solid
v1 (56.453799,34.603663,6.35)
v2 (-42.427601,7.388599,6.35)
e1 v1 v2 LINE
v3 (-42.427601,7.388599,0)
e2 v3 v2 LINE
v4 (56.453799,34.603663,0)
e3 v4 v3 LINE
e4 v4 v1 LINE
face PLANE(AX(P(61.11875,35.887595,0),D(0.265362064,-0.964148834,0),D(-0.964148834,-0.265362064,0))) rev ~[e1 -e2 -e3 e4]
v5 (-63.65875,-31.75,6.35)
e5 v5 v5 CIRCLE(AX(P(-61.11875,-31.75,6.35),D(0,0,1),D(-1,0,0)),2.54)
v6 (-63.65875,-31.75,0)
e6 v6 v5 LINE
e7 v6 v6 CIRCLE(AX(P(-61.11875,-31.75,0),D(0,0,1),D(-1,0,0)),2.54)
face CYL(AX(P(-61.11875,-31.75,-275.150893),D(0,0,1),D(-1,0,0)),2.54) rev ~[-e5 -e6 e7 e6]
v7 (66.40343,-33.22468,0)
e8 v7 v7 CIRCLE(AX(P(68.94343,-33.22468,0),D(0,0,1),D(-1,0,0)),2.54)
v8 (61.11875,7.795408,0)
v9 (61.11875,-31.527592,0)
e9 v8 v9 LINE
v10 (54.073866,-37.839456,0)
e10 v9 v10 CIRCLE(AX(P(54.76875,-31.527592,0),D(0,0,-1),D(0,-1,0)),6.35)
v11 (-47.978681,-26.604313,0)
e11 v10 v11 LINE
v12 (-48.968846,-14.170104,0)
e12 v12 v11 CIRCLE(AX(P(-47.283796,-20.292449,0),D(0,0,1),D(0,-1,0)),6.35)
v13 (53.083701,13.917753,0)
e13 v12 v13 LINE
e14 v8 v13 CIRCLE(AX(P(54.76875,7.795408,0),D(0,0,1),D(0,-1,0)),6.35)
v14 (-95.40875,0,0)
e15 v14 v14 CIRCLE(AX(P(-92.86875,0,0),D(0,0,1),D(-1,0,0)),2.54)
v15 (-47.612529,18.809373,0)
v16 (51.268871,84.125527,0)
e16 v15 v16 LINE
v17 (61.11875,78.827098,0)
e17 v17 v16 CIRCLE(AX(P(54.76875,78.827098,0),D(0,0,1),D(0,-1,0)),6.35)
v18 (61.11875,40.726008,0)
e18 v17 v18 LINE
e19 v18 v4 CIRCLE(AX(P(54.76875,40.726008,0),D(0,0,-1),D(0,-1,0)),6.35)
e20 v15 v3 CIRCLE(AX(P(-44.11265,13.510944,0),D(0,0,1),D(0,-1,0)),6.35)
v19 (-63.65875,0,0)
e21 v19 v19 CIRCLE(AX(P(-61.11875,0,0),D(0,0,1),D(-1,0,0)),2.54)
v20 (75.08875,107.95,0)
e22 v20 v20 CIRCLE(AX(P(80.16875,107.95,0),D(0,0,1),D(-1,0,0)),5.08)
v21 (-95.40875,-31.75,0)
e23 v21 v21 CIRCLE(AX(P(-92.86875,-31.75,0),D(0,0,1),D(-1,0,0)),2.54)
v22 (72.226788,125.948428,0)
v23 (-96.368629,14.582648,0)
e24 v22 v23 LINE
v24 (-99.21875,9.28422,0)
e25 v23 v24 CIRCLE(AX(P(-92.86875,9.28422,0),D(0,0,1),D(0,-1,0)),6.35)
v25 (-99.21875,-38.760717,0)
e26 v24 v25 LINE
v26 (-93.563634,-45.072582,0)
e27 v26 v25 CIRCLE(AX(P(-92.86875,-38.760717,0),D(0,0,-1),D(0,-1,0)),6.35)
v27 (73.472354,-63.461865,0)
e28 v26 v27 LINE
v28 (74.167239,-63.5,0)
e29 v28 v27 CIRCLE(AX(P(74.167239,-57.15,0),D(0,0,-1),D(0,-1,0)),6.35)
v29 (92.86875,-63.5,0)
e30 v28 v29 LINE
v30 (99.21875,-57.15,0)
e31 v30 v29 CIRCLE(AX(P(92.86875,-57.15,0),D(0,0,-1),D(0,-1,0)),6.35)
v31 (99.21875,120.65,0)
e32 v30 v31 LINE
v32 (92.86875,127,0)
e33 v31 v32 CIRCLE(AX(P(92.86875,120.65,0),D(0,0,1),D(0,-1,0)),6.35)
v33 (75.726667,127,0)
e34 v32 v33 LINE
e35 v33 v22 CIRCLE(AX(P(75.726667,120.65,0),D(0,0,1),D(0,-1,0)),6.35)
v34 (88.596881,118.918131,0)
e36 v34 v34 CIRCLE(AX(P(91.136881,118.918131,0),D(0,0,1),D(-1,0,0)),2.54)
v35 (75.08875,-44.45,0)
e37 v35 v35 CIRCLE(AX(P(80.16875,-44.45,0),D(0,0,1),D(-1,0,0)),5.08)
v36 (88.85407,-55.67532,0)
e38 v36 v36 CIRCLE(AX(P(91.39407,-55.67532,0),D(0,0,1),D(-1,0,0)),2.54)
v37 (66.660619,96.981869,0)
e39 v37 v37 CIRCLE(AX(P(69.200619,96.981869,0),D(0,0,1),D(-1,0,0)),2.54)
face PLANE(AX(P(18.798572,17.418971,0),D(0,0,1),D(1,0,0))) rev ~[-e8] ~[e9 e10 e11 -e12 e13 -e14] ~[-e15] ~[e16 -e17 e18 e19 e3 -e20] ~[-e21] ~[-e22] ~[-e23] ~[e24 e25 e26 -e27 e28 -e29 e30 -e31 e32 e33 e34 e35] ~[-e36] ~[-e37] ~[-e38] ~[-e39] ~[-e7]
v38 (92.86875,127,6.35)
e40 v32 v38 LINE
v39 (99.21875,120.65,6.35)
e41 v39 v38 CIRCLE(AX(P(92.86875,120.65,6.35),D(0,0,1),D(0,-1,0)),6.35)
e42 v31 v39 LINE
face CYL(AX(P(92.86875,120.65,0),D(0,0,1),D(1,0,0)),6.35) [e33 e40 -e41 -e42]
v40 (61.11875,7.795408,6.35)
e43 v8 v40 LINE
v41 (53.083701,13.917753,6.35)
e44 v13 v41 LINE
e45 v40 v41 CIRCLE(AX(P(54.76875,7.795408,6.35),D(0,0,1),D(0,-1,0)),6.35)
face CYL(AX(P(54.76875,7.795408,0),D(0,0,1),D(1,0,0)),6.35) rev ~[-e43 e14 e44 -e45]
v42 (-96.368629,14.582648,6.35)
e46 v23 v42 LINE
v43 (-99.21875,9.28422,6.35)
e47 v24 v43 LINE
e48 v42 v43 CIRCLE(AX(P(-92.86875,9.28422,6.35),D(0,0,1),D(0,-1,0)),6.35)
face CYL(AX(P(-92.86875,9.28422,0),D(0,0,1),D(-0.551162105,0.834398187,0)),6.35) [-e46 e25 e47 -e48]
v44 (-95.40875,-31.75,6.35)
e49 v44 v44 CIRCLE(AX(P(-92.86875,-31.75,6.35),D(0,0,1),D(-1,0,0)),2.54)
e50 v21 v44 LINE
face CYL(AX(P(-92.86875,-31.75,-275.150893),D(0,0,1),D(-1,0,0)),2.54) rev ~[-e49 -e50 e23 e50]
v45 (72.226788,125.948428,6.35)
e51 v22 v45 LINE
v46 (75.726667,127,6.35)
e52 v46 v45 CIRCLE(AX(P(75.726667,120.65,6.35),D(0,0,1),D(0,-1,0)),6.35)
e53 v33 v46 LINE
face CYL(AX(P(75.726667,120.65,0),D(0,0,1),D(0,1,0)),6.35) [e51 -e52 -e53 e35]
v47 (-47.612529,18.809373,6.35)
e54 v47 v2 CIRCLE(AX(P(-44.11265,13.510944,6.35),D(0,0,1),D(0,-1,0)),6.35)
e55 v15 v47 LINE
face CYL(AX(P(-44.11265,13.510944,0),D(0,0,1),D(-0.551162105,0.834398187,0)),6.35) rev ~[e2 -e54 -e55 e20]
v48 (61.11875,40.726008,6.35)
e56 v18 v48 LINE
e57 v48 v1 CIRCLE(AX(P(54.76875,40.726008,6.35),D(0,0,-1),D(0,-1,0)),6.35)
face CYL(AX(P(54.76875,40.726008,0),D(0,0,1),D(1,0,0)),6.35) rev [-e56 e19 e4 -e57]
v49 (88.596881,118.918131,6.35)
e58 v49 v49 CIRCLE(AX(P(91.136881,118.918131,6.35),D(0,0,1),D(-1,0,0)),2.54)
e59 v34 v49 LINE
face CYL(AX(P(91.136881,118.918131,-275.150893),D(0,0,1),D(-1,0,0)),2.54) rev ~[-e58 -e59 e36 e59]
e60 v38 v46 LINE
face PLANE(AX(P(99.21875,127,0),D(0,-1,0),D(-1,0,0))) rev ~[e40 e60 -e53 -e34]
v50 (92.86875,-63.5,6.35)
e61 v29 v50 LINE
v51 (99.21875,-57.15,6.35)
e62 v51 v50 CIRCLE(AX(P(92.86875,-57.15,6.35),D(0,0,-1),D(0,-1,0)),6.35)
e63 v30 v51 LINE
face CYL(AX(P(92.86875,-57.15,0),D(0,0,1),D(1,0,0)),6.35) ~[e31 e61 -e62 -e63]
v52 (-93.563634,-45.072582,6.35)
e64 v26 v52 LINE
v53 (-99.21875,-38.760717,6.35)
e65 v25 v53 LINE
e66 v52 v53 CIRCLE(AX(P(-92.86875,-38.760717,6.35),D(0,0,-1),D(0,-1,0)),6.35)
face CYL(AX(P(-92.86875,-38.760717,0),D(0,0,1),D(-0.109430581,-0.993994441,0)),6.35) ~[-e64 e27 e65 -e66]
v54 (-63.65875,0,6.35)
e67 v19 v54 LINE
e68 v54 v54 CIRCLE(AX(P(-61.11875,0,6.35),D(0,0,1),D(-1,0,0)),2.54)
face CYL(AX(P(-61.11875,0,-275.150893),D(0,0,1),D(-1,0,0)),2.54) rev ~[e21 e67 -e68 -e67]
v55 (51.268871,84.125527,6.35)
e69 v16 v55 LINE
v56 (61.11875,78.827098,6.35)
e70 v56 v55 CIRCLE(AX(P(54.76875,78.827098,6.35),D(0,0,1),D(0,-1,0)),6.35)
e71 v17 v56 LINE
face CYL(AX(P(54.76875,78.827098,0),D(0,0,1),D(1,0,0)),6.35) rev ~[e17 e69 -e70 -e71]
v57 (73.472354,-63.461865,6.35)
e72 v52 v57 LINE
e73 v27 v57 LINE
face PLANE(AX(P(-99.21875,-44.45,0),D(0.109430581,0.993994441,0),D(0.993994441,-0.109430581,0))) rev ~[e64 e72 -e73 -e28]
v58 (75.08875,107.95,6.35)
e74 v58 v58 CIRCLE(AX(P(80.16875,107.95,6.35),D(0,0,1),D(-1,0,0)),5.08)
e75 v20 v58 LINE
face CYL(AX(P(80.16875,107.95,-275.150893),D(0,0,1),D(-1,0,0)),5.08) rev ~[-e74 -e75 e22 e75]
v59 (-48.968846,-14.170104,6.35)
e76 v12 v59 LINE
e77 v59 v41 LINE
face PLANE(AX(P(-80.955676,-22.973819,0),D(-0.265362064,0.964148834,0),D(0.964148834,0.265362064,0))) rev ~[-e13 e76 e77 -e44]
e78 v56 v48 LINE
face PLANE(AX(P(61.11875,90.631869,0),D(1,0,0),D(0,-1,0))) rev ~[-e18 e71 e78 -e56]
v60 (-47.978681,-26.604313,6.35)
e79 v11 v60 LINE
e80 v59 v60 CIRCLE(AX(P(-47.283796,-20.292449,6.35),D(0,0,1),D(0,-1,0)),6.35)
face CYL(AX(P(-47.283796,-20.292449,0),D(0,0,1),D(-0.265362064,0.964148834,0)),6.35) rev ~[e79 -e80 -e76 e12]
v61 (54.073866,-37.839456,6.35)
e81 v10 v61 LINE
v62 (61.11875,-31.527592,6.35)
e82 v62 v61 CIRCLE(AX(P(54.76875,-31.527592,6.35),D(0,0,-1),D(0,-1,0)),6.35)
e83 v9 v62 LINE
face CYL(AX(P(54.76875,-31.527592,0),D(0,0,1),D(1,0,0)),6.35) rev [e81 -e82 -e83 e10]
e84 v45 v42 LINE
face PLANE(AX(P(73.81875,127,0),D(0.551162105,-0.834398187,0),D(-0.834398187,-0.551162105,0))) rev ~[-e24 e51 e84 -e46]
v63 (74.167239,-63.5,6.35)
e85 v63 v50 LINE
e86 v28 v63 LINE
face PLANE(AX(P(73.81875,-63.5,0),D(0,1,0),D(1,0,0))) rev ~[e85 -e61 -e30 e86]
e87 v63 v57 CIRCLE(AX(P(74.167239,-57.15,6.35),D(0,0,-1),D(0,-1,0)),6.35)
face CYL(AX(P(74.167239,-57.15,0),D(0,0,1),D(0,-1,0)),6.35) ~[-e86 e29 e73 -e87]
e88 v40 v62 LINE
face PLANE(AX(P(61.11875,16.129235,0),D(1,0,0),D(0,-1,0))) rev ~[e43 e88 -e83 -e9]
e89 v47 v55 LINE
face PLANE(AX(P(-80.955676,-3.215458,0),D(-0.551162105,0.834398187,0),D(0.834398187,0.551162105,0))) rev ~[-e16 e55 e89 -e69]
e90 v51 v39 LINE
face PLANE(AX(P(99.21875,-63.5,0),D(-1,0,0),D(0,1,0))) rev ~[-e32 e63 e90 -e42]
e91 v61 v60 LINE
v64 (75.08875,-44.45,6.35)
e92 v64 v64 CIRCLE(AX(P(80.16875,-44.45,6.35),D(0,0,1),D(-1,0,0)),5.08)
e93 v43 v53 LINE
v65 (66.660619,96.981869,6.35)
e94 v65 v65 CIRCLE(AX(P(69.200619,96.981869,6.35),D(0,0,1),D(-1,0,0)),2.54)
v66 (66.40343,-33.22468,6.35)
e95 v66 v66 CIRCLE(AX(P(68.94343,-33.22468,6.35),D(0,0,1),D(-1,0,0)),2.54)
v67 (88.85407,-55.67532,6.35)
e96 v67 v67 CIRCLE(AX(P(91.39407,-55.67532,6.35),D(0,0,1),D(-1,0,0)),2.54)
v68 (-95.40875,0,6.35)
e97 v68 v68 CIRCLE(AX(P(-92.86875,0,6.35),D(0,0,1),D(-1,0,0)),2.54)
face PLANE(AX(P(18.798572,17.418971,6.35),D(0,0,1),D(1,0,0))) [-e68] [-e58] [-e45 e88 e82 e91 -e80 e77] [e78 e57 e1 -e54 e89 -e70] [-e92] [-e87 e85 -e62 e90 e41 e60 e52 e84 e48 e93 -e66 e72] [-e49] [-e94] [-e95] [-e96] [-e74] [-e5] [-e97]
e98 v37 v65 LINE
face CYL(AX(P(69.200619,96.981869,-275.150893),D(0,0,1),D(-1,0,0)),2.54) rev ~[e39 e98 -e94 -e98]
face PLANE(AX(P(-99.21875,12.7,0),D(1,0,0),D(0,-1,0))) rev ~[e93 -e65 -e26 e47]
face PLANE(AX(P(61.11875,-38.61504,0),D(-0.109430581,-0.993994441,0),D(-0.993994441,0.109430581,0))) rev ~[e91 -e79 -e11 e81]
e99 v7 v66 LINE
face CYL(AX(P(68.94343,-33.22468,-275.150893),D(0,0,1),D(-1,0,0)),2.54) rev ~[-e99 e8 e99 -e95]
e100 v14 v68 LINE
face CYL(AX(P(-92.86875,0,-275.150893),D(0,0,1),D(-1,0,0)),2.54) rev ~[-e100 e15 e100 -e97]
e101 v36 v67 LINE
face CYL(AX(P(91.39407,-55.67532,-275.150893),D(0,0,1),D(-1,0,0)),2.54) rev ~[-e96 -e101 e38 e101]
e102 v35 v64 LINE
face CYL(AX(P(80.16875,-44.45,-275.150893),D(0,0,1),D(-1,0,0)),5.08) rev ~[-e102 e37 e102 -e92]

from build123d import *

# Parameters (mm, degrees)
F1_DEPTH = 6.35
F2_R     = 6.35
F3_D     = 10.16
F4_D     = 5.08


with BuildPart() as f1:
    # F0 (on Top) → F1 (new body)
    with BuildSketch(Plane.XY):
        Polygon((99.21875, -63.5), (99.21875, 127), (73.81875, 127), (-99.21875, 12.7), (-99.21875, -15.2791400352), (-99.21875, -20.9632049465), (-99.21875, -44.45), (73.81875, -63.5), align=None)
        Polygon((61.11875, -38.6150398089), (-80.955676291, -22.9738185659), (61.11875, 16.1292345417), align=None, mode=Mode.SUBTRACT)
        Polygon((61.11875, 35.8875947884), (-80.955676291, -3.2154583192), (61.11875, 90.6318691391), align=None, mode=Mode.SUBTRACT)
    extrude(amount=F1_DEPTH)

    # F2
    f2_edges = [f1.edges().sort_by_distance(p)[0] for p in [
        (99.21875, -63.5, 3.175),
        (99.21875, 127, 3.175),
        (-80.955676, -3.215458, 3.175),
        (-80.955676, -22.973819, 3.175),
        (61.11875, 90.631869, 3.175),
        (61.11875, 16.129235, 3.175),
        (61.11875, -38.61504, 3.175),
        (61.11875, 35.887595, 3.175),
        (-99.21875, -44.45, 3.175),
        (73.81875, -63.5, 3.175),
        (73.81875, 127, 3.175),
        (-99.21875, 12.7, 3.175),
    ]]
    fillet(f2_edges, radius=F2_R)

    # F3 (through all)
    with Locations(Plane(origin=(0, 0, 0), x_dir=(1, 0, 0), z_dir=(0, 0, -1))):
        with Locations((80.16875, -107.95), (80.16875, 44.45)):
            Hole(F3_D / 2)

    # F4 (through all)
    with Locations(Plane(origin=(0, 0, 0), x_dir=(1, 0, 0), z_dir=(0, 0, -1))):
        with Locations((91.1368808609, -118.9181308609), (69.2006191391, -96.9818691391), (91.3940701513, 55.6753201513), (68.9434298487, 33.2246798487), (-61.11875, 31.75), (-92.86875, 0), (-61.11875, 0), (-92.86875, 31.75)):
            Hole(F4_D / 2)


solid = f1.part
